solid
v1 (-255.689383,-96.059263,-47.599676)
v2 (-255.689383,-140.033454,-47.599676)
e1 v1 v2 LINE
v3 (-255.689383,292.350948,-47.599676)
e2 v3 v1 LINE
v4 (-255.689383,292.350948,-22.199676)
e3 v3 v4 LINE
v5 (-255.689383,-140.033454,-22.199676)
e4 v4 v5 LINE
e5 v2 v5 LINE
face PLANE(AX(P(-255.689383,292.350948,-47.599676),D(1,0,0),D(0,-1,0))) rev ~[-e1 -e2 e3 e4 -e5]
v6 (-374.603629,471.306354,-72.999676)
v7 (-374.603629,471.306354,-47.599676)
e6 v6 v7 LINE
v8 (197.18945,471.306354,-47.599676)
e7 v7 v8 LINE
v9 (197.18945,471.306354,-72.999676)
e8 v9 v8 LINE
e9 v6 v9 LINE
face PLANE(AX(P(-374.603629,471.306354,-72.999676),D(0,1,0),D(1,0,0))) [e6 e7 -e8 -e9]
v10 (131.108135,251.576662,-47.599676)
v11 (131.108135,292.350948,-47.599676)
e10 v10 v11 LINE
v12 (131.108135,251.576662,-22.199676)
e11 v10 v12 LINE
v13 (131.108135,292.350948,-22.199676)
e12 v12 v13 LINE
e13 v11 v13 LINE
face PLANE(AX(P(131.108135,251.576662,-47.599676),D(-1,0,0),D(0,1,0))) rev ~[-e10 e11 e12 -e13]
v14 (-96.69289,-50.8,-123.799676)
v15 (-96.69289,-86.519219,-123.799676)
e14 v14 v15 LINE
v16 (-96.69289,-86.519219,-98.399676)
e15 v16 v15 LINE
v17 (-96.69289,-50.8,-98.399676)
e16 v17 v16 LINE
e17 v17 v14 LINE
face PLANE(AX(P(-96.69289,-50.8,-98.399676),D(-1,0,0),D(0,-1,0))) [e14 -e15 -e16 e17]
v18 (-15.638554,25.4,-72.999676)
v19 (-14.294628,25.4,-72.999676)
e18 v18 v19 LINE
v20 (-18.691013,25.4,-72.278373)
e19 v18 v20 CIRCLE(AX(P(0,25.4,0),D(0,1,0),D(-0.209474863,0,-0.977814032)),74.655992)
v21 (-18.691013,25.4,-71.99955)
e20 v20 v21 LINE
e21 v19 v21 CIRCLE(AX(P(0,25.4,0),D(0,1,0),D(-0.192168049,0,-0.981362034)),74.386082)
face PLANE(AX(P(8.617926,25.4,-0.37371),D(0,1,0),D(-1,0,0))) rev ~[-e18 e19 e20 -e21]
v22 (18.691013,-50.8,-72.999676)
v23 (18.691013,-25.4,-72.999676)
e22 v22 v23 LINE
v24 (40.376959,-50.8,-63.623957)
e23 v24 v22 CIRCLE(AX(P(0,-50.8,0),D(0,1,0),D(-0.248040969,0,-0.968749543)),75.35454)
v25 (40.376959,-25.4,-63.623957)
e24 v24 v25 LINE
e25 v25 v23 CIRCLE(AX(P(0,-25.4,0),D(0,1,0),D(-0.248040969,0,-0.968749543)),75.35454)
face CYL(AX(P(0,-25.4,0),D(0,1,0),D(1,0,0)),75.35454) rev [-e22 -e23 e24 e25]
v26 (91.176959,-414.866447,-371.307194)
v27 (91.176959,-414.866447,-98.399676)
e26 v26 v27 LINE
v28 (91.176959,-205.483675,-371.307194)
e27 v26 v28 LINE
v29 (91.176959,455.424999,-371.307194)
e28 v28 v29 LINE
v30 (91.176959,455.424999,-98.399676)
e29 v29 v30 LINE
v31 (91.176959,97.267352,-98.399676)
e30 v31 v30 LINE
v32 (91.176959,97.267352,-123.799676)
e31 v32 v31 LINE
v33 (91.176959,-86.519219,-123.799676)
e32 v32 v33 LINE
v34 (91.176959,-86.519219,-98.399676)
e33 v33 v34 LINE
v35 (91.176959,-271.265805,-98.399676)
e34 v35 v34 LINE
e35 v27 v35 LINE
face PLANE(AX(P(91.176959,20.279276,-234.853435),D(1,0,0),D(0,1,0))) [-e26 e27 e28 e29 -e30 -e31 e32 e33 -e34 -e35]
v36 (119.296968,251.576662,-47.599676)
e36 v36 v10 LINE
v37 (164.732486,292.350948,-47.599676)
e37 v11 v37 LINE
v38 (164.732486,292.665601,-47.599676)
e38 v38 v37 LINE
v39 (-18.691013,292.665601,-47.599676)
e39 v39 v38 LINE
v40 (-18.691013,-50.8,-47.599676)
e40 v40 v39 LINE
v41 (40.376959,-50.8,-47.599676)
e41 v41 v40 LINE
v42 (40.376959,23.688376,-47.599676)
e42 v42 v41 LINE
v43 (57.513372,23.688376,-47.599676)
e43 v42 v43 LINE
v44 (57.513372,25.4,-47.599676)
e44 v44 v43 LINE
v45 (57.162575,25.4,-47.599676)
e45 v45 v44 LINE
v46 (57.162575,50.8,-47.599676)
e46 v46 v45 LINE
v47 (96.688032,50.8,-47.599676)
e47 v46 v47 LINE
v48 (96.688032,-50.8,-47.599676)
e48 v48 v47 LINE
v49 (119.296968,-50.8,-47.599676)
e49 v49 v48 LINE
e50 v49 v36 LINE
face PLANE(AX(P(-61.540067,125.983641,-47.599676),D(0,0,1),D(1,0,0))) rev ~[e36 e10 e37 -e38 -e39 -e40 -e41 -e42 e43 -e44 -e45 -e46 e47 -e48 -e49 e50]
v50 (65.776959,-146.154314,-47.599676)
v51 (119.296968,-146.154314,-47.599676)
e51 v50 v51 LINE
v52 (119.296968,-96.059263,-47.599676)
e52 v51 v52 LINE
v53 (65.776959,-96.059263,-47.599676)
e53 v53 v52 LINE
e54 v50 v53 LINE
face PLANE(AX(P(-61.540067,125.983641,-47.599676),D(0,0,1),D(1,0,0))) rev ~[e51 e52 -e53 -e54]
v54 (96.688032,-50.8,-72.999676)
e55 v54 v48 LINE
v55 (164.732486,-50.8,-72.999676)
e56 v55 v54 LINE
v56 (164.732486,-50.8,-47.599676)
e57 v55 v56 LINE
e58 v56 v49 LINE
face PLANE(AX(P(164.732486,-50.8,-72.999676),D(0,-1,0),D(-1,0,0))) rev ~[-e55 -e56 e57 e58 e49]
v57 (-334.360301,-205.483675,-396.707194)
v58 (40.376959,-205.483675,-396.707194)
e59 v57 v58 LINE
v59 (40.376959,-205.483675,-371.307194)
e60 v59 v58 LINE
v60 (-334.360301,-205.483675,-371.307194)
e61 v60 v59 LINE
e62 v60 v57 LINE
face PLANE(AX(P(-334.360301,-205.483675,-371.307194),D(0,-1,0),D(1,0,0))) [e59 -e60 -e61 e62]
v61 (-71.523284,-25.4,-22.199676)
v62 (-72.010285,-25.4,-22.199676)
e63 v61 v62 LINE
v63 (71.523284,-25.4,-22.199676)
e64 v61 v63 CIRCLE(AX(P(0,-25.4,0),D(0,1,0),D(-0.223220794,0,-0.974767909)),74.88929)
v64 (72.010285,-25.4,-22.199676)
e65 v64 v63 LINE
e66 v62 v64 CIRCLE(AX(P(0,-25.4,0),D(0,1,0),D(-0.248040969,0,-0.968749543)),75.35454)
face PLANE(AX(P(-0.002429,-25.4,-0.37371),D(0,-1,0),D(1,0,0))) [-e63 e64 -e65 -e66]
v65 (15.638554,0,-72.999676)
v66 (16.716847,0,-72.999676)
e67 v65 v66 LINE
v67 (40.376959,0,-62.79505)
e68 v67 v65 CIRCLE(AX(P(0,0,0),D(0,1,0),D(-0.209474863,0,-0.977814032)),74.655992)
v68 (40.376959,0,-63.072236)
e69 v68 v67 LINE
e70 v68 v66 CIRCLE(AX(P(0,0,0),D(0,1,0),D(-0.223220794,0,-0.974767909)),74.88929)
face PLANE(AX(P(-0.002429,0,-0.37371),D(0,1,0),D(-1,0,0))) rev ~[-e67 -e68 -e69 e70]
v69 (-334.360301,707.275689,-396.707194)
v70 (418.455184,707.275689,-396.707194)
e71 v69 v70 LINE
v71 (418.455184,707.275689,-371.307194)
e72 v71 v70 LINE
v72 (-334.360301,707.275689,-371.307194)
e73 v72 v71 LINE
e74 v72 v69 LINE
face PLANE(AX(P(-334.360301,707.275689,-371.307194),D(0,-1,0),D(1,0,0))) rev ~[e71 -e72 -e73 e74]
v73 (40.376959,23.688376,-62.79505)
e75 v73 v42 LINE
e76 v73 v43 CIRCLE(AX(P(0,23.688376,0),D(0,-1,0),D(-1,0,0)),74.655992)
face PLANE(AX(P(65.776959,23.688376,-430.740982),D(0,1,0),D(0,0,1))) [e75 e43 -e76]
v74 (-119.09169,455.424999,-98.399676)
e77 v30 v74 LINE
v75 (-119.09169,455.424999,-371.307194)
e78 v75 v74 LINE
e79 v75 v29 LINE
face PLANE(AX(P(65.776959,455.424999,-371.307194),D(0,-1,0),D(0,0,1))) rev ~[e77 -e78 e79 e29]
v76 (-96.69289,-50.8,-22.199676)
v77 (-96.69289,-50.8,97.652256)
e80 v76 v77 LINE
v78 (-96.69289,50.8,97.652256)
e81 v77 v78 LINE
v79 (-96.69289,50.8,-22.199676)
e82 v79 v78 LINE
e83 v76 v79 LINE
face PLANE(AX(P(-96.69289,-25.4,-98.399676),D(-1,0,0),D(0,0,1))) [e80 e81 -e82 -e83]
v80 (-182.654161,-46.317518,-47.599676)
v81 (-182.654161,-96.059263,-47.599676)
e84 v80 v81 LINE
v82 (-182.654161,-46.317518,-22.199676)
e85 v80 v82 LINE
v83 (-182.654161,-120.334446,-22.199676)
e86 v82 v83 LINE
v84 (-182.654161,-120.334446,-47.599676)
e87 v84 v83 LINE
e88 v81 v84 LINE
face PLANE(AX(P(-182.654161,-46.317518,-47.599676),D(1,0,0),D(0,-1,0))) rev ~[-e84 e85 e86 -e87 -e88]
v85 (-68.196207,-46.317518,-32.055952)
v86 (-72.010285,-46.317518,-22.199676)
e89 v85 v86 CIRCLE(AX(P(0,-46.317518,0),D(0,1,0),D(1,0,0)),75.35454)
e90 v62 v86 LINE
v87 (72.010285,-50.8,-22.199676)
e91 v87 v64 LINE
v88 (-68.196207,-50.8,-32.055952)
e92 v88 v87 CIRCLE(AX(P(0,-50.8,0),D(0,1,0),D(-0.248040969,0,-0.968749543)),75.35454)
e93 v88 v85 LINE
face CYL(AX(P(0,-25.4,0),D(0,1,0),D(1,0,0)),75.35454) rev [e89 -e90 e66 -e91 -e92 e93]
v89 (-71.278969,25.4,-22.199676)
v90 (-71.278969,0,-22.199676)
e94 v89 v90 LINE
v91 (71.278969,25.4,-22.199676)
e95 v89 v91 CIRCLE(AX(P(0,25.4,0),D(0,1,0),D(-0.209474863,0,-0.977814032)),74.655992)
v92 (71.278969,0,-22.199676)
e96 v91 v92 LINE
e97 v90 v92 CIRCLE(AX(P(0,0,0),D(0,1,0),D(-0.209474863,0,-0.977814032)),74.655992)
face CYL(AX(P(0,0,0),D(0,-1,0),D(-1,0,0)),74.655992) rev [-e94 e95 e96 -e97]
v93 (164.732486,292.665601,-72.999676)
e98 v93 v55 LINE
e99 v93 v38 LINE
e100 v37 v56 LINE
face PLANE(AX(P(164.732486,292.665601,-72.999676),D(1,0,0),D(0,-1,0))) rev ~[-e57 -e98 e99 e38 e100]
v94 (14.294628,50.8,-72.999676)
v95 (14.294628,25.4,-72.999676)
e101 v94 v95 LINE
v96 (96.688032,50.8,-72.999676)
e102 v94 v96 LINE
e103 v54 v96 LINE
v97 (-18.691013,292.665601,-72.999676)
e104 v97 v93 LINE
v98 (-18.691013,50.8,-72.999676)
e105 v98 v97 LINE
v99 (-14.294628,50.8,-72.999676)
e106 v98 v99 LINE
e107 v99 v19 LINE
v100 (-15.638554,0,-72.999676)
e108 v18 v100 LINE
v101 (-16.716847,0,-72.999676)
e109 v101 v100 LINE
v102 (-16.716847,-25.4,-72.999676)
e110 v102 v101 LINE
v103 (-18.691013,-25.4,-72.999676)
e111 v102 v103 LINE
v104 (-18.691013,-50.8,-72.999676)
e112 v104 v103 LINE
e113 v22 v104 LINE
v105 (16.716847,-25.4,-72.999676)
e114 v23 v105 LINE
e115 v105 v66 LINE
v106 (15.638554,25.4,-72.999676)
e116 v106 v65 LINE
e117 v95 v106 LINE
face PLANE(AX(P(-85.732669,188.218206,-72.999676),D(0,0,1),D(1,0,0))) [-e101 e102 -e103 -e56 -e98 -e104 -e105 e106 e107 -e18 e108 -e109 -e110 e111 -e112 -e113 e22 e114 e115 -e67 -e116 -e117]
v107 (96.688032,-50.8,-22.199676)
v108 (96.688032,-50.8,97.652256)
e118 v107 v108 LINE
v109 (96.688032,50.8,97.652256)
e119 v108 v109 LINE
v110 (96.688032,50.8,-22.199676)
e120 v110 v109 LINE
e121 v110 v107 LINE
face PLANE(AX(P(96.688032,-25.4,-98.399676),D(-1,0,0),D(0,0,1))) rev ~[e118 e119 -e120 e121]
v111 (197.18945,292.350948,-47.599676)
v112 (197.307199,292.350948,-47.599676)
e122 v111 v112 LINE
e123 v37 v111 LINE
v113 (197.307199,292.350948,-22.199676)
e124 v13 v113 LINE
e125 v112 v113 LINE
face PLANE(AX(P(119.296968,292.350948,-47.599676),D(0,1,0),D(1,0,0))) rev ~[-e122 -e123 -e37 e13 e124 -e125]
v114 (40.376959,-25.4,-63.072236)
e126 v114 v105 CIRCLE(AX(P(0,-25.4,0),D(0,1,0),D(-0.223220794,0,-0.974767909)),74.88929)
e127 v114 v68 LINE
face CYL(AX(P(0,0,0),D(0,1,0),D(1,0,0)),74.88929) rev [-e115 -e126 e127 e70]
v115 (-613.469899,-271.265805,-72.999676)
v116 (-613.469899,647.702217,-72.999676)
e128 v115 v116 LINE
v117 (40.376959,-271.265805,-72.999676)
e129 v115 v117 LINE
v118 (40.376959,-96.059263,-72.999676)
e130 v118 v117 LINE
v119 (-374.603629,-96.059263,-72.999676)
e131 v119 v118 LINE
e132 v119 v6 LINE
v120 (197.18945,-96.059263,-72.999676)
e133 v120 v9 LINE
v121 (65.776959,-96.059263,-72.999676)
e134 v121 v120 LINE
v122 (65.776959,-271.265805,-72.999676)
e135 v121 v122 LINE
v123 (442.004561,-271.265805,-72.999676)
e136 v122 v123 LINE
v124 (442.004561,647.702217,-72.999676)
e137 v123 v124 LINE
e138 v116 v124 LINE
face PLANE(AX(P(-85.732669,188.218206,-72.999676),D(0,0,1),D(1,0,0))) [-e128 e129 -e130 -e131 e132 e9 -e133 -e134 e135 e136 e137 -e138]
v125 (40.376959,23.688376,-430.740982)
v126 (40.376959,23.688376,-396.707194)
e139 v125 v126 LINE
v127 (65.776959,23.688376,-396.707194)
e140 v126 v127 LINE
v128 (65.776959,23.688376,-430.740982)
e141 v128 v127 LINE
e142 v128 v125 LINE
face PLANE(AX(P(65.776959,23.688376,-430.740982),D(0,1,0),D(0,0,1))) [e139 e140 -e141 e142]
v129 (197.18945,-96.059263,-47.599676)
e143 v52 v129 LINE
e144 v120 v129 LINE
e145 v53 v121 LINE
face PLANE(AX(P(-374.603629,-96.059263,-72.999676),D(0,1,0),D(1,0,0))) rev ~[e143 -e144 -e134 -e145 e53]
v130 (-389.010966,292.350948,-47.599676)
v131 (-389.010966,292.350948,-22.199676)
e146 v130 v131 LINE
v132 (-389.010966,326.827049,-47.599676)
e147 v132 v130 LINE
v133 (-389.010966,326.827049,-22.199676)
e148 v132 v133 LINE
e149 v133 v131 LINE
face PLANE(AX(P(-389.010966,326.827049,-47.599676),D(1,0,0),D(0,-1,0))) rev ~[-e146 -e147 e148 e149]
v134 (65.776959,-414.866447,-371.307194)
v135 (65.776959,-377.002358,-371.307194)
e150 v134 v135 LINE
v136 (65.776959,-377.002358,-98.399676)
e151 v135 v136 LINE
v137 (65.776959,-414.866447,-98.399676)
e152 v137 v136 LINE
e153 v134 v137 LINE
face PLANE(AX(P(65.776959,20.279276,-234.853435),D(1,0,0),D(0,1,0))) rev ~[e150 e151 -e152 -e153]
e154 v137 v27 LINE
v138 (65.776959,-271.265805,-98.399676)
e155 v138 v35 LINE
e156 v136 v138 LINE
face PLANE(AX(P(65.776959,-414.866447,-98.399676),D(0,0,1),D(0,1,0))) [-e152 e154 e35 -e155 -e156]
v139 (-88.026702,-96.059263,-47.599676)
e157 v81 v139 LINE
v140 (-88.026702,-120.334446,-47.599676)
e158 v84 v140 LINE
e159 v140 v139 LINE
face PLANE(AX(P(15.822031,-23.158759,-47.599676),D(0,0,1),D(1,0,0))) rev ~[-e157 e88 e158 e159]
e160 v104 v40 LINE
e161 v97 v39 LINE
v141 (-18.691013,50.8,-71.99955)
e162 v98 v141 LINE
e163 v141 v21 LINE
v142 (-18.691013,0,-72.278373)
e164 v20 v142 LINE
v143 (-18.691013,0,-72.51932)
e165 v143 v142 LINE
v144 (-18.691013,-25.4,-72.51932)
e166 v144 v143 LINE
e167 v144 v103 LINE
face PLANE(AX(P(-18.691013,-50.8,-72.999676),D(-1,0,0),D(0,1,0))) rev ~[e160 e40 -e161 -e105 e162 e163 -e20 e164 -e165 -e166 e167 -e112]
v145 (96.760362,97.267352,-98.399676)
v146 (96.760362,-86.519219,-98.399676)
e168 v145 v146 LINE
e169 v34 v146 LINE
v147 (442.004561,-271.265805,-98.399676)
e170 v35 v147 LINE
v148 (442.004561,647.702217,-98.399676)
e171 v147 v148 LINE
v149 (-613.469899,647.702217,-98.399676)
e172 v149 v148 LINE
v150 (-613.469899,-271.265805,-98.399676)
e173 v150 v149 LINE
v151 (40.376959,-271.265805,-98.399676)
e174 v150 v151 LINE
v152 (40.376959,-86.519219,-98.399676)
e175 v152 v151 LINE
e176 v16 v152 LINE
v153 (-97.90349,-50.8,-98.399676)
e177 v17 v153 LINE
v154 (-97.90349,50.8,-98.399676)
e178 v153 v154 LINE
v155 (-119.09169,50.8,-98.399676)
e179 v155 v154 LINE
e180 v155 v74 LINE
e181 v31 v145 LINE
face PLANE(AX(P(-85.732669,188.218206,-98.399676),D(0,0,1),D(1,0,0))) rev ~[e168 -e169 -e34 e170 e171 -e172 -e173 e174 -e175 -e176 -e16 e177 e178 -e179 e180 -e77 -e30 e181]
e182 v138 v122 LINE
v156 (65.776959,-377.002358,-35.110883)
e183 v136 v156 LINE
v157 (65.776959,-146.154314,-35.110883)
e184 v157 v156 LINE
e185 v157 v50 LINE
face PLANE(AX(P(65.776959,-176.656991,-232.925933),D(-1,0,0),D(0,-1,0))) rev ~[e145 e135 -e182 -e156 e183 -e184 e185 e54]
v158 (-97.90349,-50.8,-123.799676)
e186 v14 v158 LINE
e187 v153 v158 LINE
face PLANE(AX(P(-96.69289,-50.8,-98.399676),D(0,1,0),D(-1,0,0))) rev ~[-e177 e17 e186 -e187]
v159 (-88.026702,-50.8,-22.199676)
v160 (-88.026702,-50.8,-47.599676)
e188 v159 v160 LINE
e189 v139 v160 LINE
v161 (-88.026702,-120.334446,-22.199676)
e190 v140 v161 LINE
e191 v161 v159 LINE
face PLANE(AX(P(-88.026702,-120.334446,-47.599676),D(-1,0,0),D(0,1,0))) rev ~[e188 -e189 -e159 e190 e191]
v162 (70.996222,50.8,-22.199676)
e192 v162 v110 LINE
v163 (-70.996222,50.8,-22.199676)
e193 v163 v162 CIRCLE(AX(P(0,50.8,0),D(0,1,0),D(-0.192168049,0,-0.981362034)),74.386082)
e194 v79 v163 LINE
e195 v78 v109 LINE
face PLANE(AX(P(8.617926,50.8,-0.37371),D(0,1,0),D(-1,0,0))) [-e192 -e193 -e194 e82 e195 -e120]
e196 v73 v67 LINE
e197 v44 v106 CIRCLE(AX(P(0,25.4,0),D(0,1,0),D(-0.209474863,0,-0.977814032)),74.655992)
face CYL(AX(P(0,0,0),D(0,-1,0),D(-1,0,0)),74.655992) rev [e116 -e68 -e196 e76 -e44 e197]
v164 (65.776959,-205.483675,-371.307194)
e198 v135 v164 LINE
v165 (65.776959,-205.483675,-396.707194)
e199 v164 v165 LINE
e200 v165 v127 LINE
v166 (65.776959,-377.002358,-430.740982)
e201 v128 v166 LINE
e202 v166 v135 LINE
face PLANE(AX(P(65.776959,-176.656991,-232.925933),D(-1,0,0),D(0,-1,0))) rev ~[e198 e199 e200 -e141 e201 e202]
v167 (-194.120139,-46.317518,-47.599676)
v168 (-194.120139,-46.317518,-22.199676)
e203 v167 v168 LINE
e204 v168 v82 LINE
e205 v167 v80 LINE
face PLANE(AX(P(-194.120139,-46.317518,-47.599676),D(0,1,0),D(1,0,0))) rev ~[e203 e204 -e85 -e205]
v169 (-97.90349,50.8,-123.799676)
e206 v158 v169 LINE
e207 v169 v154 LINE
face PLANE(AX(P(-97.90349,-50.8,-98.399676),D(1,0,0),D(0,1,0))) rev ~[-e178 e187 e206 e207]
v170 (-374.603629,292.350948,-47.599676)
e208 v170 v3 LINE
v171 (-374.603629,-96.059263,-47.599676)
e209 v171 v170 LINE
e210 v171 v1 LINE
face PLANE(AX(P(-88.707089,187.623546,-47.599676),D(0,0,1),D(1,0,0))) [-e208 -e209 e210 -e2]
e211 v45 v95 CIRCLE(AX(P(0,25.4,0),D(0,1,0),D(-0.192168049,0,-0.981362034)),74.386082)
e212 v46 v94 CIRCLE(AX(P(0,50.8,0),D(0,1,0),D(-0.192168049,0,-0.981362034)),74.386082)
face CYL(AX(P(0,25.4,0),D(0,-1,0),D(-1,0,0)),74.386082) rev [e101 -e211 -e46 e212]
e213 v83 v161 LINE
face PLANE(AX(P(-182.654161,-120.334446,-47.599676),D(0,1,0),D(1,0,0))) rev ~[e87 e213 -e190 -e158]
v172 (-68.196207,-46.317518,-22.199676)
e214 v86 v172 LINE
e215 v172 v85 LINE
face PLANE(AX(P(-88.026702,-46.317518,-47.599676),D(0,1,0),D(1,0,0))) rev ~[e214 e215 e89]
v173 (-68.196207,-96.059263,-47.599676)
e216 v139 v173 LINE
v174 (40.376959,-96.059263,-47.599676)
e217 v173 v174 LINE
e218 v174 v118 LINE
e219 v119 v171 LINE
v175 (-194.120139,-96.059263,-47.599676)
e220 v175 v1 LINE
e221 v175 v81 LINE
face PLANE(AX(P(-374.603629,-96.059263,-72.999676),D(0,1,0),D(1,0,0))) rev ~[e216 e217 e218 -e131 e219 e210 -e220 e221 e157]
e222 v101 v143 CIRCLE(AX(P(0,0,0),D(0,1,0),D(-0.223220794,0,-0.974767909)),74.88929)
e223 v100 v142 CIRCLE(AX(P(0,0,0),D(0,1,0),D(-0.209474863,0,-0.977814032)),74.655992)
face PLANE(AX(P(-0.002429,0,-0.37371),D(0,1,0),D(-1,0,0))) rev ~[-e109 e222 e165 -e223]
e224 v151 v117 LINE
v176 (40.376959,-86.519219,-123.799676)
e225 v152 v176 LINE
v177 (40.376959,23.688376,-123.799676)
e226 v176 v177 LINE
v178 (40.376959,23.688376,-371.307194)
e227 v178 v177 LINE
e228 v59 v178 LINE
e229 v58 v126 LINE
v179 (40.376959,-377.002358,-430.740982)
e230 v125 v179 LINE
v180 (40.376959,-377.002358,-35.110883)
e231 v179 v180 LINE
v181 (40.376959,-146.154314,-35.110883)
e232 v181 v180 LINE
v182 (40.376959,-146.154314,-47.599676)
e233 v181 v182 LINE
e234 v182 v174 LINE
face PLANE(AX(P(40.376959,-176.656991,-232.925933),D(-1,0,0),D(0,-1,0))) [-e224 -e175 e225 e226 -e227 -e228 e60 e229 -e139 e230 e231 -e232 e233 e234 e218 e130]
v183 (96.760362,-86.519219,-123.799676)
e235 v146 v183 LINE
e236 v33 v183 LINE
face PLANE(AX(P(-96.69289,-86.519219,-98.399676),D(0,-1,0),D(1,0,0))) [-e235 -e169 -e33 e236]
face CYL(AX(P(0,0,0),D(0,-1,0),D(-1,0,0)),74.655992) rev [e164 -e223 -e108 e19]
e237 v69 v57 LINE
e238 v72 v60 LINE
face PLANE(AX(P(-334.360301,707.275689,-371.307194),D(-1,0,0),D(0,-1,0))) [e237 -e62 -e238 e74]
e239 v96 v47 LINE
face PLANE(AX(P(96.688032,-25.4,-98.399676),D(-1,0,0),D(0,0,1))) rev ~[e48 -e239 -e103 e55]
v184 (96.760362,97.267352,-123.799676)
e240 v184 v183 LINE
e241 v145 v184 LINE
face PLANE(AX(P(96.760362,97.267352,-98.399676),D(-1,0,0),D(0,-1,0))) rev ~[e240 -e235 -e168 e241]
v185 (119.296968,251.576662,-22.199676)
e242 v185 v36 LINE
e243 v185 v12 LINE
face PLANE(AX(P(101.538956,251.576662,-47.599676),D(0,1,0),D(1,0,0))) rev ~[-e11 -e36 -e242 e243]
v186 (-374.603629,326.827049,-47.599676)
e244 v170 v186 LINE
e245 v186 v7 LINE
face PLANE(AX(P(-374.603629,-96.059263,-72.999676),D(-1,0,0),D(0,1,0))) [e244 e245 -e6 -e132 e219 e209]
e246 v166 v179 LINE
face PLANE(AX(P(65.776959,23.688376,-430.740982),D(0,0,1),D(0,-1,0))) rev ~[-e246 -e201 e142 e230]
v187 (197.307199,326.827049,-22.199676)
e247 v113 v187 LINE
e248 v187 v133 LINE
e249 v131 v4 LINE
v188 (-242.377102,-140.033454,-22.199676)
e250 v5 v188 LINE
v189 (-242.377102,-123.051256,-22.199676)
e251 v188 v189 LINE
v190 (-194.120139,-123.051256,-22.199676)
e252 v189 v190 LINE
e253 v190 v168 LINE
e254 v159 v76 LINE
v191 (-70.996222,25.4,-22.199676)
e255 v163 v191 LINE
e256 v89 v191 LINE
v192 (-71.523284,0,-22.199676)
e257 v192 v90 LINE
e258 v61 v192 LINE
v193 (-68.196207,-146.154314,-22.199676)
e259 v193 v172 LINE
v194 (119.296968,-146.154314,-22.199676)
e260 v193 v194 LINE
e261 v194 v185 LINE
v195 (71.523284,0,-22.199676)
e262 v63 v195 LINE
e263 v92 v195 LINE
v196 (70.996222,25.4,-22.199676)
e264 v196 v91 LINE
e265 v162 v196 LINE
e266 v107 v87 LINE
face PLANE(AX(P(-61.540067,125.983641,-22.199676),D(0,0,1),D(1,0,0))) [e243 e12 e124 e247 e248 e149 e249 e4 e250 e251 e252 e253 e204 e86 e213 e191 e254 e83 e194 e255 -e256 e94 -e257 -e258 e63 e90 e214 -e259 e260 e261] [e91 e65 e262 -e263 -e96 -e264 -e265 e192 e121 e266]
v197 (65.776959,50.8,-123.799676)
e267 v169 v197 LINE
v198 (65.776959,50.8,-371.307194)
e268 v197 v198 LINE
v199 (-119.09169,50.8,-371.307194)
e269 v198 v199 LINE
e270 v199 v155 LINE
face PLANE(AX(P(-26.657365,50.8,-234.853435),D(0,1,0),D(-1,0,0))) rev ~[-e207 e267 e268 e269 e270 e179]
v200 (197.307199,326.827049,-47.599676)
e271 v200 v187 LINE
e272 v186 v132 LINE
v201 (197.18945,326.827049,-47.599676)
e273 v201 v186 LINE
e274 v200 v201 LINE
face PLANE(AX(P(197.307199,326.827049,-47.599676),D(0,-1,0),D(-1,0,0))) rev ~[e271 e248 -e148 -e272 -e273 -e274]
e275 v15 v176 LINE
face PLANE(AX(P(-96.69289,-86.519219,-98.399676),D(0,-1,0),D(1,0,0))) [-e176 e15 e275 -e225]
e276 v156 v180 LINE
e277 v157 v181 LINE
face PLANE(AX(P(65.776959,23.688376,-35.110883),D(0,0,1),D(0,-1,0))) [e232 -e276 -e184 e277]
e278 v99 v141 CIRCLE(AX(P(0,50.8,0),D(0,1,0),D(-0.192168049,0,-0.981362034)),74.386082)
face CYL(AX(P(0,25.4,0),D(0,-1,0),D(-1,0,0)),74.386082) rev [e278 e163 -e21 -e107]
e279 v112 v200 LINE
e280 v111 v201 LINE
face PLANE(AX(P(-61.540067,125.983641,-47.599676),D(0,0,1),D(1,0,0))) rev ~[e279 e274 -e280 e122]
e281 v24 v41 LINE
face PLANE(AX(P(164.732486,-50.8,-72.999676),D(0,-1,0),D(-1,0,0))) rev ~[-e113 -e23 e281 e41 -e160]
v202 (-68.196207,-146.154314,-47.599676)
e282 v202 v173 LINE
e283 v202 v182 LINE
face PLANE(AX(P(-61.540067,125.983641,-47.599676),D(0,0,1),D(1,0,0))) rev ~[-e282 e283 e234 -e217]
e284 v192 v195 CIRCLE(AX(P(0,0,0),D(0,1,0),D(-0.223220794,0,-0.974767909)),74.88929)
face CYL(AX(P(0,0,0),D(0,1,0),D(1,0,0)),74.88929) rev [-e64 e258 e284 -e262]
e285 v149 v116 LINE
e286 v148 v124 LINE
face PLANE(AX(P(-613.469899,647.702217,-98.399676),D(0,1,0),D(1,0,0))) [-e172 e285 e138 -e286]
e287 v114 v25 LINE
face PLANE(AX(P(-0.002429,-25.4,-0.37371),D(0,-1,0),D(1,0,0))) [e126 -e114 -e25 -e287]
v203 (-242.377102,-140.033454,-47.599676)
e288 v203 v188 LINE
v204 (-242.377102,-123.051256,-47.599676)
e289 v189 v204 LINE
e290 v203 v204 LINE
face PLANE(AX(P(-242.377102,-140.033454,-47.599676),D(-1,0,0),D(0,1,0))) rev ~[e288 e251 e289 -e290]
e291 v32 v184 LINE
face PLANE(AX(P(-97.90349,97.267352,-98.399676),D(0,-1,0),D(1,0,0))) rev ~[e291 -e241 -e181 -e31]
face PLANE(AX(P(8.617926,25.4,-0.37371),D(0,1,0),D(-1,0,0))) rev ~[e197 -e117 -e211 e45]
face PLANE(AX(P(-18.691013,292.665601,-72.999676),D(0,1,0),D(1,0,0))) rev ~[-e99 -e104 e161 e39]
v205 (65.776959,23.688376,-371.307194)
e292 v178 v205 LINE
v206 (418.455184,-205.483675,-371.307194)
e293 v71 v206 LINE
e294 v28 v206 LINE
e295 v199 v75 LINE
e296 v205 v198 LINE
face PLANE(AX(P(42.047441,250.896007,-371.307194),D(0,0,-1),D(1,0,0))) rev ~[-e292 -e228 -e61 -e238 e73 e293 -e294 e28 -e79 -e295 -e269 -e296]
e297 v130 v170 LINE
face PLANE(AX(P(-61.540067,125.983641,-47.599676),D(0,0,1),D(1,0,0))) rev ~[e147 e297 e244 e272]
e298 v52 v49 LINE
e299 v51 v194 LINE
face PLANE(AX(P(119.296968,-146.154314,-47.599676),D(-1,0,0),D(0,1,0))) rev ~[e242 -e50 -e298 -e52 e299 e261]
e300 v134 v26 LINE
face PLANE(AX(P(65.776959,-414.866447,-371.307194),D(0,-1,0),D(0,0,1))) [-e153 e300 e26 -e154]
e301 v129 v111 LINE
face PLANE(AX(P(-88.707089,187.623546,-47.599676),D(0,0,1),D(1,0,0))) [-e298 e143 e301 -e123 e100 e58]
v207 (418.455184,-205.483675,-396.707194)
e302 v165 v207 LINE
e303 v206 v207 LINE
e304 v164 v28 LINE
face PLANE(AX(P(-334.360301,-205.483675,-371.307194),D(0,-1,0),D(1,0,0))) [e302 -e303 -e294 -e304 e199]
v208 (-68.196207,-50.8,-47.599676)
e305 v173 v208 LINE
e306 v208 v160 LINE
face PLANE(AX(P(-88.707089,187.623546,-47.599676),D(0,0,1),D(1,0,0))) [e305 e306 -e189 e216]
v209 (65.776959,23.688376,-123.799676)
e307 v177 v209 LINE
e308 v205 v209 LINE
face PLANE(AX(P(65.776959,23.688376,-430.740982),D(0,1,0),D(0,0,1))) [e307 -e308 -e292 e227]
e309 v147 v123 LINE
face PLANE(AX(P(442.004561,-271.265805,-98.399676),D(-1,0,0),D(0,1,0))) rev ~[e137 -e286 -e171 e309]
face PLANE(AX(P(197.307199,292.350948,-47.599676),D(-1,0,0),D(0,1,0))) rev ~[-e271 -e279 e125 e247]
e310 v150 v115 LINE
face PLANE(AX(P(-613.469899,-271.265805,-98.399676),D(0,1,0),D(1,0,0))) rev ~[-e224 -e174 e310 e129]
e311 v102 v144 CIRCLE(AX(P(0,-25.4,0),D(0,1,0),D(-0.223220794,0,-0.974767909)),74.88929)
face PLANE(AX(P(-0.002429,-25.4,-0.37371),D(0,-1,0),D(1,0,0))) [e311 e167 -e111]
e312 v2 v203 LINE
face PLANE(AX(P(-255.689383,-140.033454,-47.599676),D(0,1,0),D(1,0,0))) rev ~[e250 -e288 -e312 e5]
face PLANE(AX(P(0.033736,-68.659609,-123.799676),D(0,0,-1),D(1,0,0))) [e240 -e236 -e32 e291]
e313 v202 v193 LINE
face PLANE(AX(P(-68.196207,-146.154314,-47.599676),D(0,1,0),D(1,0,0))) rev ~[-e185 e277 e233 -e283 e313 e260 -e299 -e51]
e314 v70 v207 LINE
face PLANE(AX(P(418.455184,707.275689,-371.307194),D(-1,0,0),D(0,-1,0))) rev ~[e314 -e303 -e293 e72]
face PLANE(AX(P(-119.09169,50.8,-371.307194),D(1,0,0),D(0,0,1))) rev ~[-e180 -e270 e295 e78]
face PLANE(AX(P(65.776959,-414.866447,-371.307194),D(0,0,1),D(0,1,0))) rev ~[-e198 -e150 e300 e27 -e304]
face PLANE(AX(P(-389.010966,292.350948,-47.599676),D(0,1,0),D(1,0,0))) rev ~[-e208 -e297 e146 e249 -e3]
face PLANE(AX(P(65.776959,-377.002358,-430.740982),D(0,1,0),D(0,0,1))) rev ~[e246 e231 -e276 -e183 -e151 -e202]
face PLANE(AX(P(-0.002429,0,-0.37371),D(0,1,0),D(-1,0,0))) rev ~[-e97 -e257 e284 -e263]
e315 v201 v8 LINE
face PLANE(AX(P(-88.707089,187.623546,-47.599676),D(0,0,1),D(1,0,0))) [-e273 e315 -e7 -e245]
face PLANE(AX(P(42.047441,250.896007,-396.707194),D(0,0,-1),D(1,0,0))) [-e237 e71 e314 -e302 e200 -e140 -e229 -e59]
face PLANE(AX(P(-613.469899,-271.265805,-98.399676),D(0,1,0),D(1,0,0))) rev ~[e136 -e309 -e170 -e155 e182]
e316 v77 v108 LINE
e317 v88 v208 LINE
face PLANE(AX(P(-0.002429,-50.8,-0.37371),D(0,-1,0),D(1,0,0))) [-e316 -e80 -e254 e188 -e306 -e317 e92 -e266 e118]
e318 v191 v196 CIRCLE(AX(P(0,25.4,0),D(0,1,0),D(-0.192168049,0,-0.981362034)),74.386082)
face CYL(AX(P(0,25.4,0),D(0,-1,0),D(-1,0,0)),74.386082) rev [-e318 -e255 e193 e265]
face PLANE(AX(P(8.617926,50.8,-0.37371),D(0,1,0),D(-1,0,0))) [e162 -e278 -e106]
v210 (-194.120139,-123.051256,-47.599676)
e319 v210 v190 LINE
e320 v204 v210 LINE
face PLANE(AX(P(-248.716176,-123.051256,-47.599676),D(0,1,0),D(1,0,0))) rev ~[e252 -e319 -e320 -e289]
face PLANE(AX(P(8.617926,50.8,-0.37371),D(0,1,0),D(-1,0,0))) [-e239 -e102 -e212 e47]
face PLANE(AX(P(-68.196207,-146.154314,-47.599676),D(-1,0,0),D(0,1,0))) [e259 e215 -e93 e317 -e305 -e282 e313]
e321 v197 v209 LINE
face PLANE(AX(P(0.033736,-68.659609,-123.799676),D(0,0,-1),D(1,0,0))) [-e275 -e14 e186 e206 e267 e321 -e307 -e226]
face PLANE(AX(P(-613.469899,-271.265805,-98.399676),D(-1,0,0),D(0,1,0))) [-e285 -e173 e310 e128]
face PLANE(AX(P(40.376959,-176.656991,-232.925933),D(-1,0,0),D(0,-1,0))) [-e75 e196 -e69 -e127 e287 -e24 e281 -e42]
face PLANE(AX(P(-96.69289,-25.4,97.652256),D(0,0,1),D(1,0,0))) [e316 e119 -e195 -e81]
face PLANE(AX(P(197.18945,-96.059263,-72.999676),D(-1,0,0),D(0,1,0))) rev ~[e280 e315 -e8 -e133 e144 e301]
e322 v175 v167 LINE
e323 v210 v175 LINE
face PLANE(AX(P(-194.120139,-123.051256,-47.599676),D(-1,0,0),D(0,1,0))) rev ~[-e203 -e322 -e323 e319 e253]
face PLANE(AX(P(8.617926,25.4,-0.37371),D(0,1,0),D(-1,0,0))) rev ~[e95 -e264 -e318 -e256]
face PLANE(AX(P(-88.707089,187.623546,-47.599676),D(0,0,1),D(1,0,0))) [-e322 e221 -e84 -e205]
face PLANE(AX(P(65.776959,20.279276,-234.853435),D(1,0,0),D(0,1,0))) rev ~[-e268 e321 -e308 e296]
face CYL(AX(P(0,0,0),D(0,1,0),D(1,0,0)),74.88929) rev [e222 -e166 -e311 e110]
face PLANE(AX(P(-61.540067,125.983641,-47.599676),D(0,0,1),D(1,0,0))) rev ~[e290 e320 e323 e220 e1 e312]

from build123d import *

# Parameters (mm, degrees)
F0_W      = 193.3809220791
F0_H      = 196.0519328713
F0_R      = 74.8892897361
F1_DEPTH  = 25.4
F2_W      = 193.3809220791
F2_H      = 196.0519328713
F2_R      = 74.655991807
F3_DEPTH  = 25.4
F4_W      = 176.1402115226
F4_H      = 196.0519328713
F4_R      = 74.3860816692
F4_W_2    = 17.2407105565
F5_DEPTH  = 25.4
F6_W      = 193.3809220791
F6_H      = 196.0519328713
F6_R      = 75.3545401658
F7_DEPTH  = 25.4
F8_W      = 193.4532523155
F8_H      = 35.7192189813
F9_DEPTH  = 25.4
F11_DEPTH = 404.6249985695
F12_W     = 1055.474460125
F12_H     = 918.9680218697
F13_DEPTH = 25.4
F14_W     = 752.8154850006
F14_H     = 912.7593636513
F15_DEPTH = 25.4
F16_W     = 870.2914460182
F16_H     = 272.9075178504
F17_DEPTH = 25.4
F18_W     = 400.6907343864
F18_H     = 395.6300988793
F19_DEPTH = 25.4
F20_W     = 571.7930793762
F20_H     = 567.36561656
F21_DEPTH = 25.4
F23_W     = 78.0102312565
F23_H     = 34.4761013985
F23_W_2   = 13.3122801781
F23_H_2   = 332.7346146107
F23_W_3   = 187.4931752682
F23_H_3   = 105.7706475258
F23_H_4   = 99.6497869492
F24_DEPTH = 25.4
F25_W     = 101.5389561653
F25_H     = 251.5766620636
F25_H_2   = 50.2630472183
F25_W_2   = 29.5691788197
F25_W_3   = 54.5960366726
F25_H_3   = 76.733738184
F26_DEPTH = 25.4


with BuildPart() as f1:
    # F0 (on Front) → F1 (new body)
    with BuildSketch(Plane.XZ):
        with Locations((-0.0024288893, -0.3737099469)):
            Rectangle(F0_W, F0_H)
        Circle(F0_R, mode=Mode.SUBTRACT)
    extrude(amount=F1_DEPTH)

    # F2 (on face) → F3 (join)
    with BuildSketch(Plane(origin=(0, 0, 0), x_dir=(-1, 0, 0), z_dir=(0, 1, 0))):
        with Locations((0.0024288893, -0.3737099469)):
            Rectangle(F2_W, F2_H)
        Circle(F2_R, mode=Mode.SUBTRACT)
    extrude(amount=F3_DEPTH)

    # F4 (on face) → F5 (join)
    with BuildSketch(Plane(origin=(0, 25.4, 0), x_dir=(-1, 0, 0), z_dir=(0, 1, 0))):
        with Locations((-8.617926389, -0.3737099469)):
            Rectangle(F4_W, F4_H)
        Circle(F4_R, mode=Mode.SUBTRACT)
        with Locations((88.0725346506, -0.3737099469)):
            Rectangle(F4_W_2, F4_H)
    extrude(amount=F5_DEPTH)

    # F6 (on face) → F7 (join)
    with BuildSketch(Plane.XZ.offset(25.4)):
        with Locations((-0.0024288893, -0.3737099469)):
            Rectangle(F6_W, F6_H)
        Circle(F6_R, mode=Mode.SUBTRACT)
    extrude(amount=F7_DEPTH)

    # F8 (on face) → F9 (join)
    with BuildSketch(Plane(origin=(0, 0, -98.3996763825), x_dir=(1, 0, 0), z_dir=(0, 0, -1))):
        with Locations((0.0337362289, 68.6596094906)):
            Rectangle(F8_W, F8_H)
        Polygon((96.7603623867, 50.8), (-96.6928899288, 50.8), (-97.9034900665, 50.8), (-97.9034900665, -97.2673520446), (96.7603623867, -97.2673520446), align=None)
    extrude(amount=F9_DEPTH)

    # F10 (on face) → F11 (join)
    with BuildSketch(Plane(origin=(0, 50.8, 0), x_dir=(-1, 0, 0), z_dir=(0, 1, 0))):
        Polygon((-65.7769590616, -350.3327965736), (-65.7769590616, -371.3071942329), (119.0916895866, -371.3071942329), (119.0916895866, -98.3996763825), (-65.7769590616, -98.3996763825), align=None)
    extrude(amount=F11_DEPTH)

    # F12 (on face) → F13 (join)
    with BuildSketch(Plane.XY.offset(-98.3996763825)):
        with Locations((-85.7326686382, 188.2182061672)):
            Rectangle(F12_W, F12_H)
    extrude(amount=F13_DEPTH)

    # F14 (on face) → F15 (join)
    with BuildSketch(Plane(origin=(0, 0, -371.3071942329), x_dir=(1, 0, 0), z_dir=(0, 0, -1))):
        with Locations((42.0474410057, -250.8960068226)):
            Rectangle(F14_W, F14_H)
    extrude(amount=F15_DEPTH)

    # F16 (on face) → F17 (join)
    with BuildSketch(Plane.YZ.offset(65.7769590616)):
        with Locations((20.2792755604, -234.8534353077)):
            Rectangle(F16_W, F16_H)
    extrude(amount=F17_DEPTH)

    # F18 (on face) → F19 (join)
    with BuildSketch(Plane(origin=(65.7769590616, 0, 0), x_dir=(0, -1, 0), z_dir=(-1, 0, 0))):
        with Locations((176.6569912434, -232.9259328544)):
            Rectangle(F18_W, F18_H)
    extrude(amount=F19_DEPTH)

    # F20 (on face) → F21 (join)
    with BuildSketch(Plane.XY.offset(-72.9996763825)):
        with Locations((-88.7070894241, 187.6235455275)):
            Rectangle(F20_W, F20_H)
        Polygon((40.3769590616, -50.8), (-18.691013125, -50.8), (-18.691013125, 275.1325964928), (-18.691013125, 292.6656007767), (40.3769590616, 292.6656007767), (164.7324860096, 292.6656007767), (164.7324860096, -50.8), (129.8503279686, -50.8), align=None, mode=Mode.SUBTRACT)
    extrude(amount=F21_DEPTH)

    # F23 (on face) → F24 (join)
    with BuildSketch(Plane.XY.offset(-47.5996763825)):
        Polygon((119.2969679832, -40.3836667538), (119.2969679832, 292.3509478569), (-242.377102375, 292.3509478569), (-242.377102375, -40.3836667538), (-68.1962072849, -40.3836667538), align=None)
        with Locations((158.3020836115, 309.5889985561)):
            Rectangle(F23_W, F23_H)
        Polygon((-242.377102375, 292.3509478569), (119.2969679832, 292.3509478569), (119.2969679832, 326.8270492554), (-389.0109658241, 326.8270492554), (-389.0109658241, 292.3509478569), (-255.6893825531, 292.3509478569), align=None)
        with Locations((-249.0332424641, 125.9836405516)):
            Rectangle(F23_W_2, F23_H_2)
        with Locations((25.5503803492, -93.2689905167)):
            Rectangle(F23_W_3, F23_H_3)
        with Locations((-249.0332424641, -90.2085602283)):
            Rectangle(F23_W_2, F23_H_4)
    extrude(amount=F24_DEPTH)

    # F25 (on face) → F26 (join)
    with BuildSketch(Plane.XY.offset(-47.5996763825)):
        Polygon((101.5389561653, 0), (0, 0), (-69.8948949575, 0), (-69.8948949575, -46.3175177574), (101.5389561653, -46.3175177574), align=None)
        Polygon((-69.8948949575, 0), (0, 0), (0, 251.5766620636), (0, 301.8397092819), (-69.8948949575, 301.8397092819), (-69.8948949575, 239.4688427448), align=None)
        with Locations((50.7694780827, 125.7883310318)):
            Rectangle(F25_W, F25_H)
        Polygon((-69.8948949575, -46.3175177574), (-69.8948949575, 0), (-69.8948949575, 239.4688427448), (-116.5921464562, 239.4688427448), (-116.5921464562, -46.3175177574), (-88.026702404, -46.3175177574), align=None)
        with Locations((50.7694780827, 276.7081856728)):
            Rectangle(F25_W, F25_H_2)
        Polygon((-116.5921464562, 239.4688427448), (-69.8948949575, 239.4688427448), (-69.8948949575, 301.8397092819), (-248.7161755562, 301.8397092819), (-248.7161755562, 239.4688427448), align=None)
        with Locations((116.3235455751, 276.7081856728)):
            Rectangle(F25_W_2, F25_H_2)
        Polygon((-116.5921464562, -46.3175177574), (-116.5921464562, 239.4688427448), (-248.7161755562, 239.4688427448), (-248.7161755562, -46.3175177574), (-194.1201388836, -46.3175177574), (-182.6541610062, -46.3175177574), align=None)
        Polygon((-88.026702404, -120.3344464302), (-88.026702404, -46.3175177574), (-116.5921464562, -46.3175177574), (-182.6541610062, -46.3175177574), (-182.6541610062, -120.3344464302), align=None)
        with Locations((-221.4181572199, -84.6843868494)):
            Rectangle(F25_W_3, F25_H_3)
    extrude(amount=F26_DEPTH)


solid = f1.part
